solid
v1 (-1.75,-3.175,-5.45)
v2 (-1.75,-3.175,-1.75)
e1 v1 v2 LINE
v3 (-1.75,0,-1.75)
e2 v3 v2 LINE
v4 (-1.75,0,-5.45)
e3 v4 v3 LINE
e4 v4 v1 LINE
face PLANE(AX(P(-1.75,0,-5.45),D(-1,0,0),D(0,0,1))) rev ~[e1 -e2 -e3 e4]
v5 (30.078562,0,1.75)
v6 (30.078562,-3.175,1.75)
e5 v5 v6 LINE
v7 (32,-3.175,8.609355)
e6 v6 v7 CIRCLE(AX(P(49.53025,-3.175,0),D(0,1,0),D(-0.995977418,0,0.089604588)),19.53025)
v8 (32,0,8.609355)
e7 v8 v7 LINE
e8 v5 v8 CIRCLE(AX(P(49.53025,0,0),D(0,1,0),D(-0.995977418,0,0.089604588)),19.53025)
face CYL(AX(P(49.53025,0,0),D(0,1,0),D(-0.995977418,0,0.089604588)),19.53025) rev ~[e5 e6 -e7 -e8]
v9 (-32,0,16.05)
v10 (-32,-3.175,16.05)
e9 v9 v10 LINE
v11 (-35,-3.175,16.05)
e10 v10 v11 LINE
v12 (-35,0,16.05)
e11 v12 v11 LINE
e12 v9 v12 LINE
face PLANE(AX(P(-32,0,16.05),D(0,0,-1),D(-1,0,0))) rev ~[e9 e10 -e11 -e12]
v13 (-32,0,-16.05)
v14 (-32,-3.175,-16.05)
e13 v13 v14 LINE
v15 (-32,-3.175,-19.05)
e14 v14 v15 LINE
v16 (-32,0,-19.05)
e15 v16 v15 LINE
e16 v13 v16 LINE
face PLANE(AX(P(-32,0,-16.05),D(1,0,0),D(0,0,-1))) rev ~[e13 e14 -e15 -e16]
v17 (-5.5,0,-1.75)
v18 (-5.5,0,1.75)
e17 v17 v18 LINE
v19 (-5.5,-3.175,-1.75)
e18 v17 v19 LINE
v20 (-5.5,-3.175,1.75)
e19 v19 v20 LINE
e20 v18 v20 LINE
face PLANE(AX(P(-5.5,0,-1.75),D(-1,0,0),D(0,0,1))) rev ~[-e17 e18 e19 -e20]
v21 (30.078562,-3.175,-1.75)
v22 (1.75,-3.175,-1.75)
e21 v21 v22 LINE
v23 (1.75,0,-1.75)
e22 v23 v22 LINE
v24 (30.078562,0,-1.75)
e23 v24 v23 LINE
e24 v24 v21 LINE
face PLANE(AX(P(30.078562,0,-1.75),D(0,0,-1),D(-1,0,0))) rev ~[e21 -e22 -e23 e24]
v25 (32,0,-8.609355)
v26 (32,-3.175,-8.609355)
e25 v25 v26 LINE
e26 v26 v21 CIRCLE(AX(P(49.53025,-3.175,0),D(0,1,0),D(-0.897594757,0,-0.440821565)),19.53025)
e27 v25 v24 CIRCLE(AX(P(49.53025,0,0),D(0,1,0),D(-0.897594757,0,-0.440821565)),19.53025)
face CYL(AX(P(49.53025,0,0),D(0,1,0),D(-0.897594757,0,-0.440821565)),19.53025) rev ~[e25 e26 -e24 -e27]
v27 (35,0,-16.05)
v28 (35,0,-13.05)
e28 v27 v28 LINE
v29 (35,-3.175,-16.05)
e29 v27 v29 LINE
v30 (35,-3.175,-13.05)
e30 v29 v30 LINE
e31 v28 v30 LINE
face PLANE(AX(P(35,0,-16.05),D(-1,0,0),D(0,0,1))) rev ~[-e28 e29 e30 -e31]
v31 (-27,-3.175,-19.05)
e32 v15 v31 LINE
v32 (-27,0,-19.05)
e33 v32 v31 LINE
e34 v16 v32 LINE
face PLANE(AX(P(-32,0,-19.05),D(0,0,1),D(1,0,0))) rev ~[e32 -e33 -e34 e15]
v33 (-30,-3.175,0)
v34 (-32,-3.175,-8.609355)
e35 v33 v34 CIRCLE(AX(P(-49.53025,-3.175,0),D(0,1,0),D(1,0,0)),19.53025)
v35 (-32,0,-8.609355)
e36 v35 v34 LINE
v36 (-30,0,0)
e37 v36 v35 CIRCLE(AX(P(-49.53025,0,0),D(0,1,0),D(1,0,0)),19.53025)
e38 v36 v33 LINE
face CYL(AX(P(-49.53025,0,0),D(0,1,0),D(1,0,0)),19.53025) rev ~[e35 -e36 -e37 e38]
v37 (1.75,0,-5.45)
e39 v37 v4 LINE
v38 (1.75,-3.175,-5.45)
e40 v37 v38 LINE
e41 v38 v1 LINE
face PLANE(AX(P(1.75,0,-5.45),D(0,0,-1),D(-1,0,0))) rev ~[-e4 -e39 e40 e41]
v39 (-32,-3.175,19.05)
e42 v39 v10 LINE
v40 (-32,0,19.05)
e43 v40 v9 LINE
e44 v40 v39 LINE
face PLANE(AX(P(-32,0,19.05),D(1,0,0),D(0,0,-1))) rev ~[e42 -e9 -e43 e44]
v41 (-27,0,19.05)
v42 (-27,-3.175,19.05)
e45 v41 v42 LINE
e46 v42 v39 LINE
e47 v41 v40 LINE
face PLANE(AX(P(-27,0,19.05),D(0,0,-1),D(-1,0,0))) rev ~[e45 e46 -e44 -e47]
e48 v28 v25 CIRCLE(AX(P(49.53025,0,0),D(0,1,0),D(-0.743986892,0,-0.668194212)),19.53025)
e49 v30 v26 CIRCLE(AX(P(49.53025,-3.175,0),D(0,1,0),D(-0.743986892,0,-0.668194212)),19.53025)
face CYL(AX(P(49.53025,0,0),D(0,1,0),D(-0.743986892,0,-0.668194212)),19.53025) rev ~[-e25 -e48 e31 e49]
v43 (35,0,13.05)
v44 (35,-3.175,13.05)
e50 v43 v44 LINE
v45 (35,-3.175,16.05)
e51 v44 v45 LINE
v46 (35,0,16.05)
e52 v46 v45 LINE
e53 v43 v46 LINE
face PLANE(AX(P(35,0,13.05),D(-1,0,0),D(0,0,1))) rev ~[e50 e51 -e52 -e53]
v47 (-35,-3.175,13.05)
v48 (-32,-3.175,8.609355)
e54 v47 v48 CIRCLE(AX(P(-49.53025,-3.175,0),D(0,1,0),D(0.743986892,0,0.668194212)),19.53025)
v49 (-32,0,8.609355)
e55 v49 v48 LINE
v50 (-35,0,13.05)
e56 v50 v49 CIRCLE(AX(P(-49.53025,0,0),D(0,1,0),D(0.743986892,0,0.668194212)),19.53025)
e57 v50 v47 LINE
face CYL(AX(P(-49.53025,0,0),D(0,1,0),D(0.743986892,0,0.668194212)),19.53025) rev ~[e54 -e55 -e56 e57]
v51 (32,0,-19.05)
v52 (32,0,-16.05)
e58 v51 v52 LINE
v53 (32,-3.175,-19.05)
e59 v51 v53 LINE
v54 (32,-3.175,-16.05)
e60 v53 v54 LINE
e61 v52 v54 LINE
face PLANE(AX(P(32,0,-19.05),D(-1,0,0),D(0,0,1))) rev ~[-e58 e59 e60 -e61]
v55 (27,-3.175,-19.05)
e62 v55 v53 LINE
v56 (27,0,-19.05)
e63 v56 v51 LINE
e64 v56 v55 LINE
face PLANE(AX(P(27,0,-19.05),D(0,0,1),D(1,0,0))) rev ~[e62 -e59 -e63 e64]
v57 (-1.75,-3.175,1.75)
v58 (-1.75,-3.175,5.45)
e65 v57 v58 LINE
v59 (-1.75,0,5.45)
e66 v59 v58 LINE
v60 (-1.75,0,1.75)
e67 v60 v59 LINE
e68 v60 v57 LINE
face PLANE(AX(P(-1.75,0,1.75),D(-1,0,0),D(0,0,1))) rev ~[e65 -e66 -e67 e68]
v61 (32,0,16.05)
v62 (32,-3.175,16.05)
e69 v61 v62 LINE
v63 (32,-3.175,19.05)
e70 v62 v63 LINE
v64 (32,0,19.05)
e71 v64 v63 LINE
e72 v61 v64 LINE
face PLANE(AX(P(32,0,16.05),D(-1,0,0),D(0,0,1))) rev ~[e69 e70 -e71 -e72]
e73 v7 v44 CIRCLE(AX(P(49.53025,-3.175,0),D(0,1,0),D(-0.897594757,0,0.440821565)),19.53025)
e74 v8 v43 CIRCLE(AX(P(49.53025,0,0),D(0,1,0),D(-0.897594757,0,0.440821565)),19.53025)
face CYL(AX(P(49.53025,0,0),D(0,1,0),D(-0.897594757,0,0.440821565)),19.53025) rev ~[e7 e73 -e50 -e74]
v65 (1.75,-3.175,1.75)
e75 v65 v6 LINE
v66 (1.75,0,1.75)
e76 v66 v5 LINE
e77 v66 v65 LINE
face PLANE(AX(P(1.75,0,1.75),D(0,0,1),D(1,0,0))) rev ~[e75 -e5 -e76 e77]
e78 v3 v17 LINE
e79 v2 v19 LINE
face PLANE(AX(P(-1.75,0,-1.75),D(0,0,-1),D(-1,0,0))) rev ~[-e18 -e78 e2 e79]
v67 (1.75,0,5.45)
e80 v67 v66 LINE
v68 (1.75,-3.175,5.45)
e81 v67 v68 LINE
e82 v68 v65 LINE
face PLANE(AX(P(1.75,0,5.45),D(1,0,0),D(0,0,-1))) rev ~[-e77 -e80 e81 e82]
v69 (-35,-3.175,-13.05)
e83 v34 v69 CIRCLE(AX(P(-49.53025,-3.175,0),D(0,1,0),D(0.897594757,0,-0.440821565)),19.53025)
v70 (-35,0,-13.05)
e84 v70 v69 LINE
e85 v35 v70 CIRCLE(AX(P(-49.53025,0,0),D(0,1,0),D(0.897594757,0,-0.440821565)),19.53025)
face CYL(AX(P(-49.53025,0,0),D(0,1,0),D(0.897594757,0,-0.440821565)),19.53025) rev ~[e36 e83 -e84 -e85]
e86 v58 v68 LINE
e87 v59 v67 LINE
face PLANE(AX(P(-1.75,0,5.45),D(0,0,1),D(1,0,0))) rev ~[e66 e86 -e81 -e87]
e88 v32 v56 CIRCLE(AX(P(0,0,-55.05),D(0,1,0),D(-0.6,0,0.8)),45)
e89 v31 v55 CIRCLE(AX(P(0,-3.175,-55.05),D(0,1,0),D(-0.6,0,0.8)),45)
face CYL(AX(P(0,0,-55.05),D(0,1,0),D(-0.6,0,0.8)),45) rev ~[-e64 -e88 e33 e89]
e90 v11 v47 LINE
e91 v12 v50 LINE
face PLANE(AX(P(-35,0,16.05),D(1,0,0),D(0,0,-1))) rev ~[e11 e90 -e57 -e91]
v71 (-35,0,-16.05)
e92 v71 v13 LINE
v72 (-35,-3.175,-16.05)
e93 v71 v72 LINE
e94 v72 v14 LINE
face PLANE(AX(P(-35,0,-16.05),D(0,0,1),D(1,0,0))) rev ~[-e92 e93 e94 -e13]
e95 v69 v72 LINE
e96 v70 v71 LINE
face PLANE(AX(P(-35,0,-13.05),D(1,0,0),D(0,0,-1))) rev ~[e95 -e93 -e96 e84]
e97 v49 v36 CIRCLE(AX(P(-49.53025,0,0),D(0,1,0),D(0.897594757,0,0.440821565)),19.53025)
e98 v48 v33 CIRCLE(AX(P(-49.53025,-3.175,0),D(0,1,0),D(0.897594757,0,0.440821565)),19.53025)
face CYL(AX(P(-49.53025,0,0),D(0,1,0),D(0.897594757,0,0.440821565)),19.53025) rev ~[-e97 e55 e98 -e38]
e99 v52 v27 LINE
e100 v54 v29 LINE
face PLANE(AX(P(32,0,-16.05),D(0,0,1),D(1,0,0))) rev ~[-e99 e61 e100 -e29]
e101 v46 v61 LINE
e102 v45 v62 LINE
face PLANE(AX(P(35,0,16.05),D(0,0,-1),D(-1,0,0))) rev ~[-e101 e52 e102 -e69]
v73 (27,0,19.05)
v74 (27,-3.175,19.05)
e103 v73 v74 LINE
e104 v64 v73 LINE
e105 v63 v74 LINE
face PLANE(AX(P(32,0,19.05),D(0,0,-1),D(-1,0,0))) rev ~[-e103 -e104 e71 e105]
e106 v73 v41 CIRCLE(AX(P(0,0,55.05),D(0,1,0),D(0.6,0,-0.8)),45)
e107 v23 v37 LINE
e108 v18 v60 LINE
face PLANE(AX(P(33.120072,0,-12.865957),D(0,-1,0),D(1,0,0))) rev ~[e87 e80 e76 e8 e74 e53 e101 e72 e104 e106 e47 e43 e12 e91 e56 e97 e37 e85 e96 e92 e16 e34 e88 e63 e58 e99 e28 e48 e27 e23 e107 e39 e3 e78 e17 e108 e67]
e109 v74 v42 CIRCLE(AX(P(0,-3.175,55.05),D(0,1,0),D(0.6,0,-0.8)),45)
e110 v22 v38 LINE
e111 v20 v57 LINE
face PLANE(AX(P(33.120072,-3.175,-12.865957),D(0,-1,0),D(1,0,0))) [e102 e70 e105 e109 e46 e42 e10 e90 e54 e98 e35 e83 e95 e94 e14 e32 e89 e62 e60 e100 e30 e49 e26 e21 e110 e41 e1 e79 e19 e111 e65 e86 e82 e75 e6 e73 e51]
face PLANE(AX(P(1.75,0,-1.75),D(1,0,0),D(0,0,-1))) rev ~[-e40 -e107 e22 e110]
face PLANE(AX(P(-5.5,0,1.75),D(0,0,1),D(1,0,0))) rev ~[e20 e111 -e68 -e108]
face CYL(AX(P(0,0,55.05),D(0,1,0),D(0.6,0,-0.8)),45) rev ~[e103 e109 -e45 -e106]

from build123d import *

# Parameters (mm, degrees)
F1_DEPTH = 3.175


# Not quite as in the source:
# - a length typed as a fraction of an inch, garbled in the dataset ("3 / 203.2 mm" for 3/8 in), is restored


with BuildPart() as f1:
    # F0 (on Front) → F1 (new body)
    with BuildSketch(Plane.XZ):
        with BuildLine():
            Line((32, -16.05), (35, -16.05))
            Line((35, -16.05), (35, -13.05))
            ThreePointArc((35, -13.05), (33.3469639854, -10.9330653905), (32, -8.6093553766))
            Line((32, -8.6093553766), (32, -16.05))
        make_face()
        with BuildLine():
            ThreePointArc((32, 8.6093553766), (33.3469639854, 10.9330653905), (35, 13.05))
            Line((35, 13.05), (35, 16.05))
            Line((35, 16.05), (32, 16.05))
            Line((32, 16.05), (32, 8.6093553766))
        make_face()
        with BuildLine():
            Line((-35, -16.05), (-32, -16.05))
            Line((-32, -16.05), (-32, -8.6093553766))
            ThreePointArc((-32, -8.6093553766), (-33.3469639854, -10.9330653905), (-35, -13.05))
            Line((-35, -13.05), (-35, -16.05))
        make_face()
        with BuildLine():
            Line((27, -19.05), (32, -19.05))
            Line((32, -19.05), (32, -16.05))
            Line((32, -16.05), (32, -8.6093553766))
            ThreePointArc((32, -8.6093553766), (30.7239047108, -5.268020684), (30.0785620254, -1.75))
            Line((30.0785620254, -1.75), (1.75, -1.75))
            Line((1.75, -1.75), (1.75, -5.45))
            Line((1.75, -5.45), (-1.75, -5.45))
            Line((-1.75, -5.45), (-1.75, -1.75))
            Line((-1.75, -1.75), (-5.5, -1.75))
            Line((-5.5, -1.75), (-5.5, 0))
            Line((-5.5, 0), (-30, 0))
            ThreePointArc((-30, 0), (-30.5065696236, -4.4193042439), (-32, -8.6093553766))
            Line((-32, -8.6093553766), (-32, -16.05))
            Line((-32, -16.05), (-32, -19.05))
            Line((-32, -19.05), (-27, -19.05))
            ThreePointArc((-27, -19.05), (0, -10.05), (27, -19.05))
        make_face()
        with BuildLine():
            ThreePointArc((30.0785620254, 1.75), (30.7239047108, 5.268020684), (32, 8.6093553766))
            Line((32, 8.6093553766), (32, 16.05))
            Line((32, 16.05), (32, 19.05))
            Line((32, 19.05), (27, 19.05))
            ThreePointArc((27, 19.05), (0, 10.05), (-27, 19.05))
            Line((-27, 19.05), (-32, 19.05))
            Line((-32, 19.05), (-32, 16.05))
            Line((-32, 16.05), (-32, 8.6093553766))
            ThreePointArc((-32, 8.6093553766), (-30.5065696236, 4.4193042439), (-30, 0))
            Line((-30, 0), (-5.5, 0))
            Line((-5.5, 0), (-5.5, 1.75))
            Line((-5.5, 1.75), (-1.75, 1.75))
            Line((-1.75, 1.75), (-1.75, 5.45))
            Line((-1.75, 5.45), (1.75, 5.45))
            Line((1.75, 5.45), (1.75, 1.75))
            Line((1.75, 1.75), (30.0785620254, 1.75))
        make_face()
        with BuildLine():
            ThreePointArc((-35, 13.05), (-33.3469639854, 10.9330653905), (-32, 8.6093553766))
            Line((-32, 8.6093553766), (-32, 16.05))
            Line((-32, 16.05), (-35, 16.05))
            Line((-35, 16.05), (-35, 13.05))
        make_face()
    extrude(amount=F1_DEPTH)


solid = f1.part
